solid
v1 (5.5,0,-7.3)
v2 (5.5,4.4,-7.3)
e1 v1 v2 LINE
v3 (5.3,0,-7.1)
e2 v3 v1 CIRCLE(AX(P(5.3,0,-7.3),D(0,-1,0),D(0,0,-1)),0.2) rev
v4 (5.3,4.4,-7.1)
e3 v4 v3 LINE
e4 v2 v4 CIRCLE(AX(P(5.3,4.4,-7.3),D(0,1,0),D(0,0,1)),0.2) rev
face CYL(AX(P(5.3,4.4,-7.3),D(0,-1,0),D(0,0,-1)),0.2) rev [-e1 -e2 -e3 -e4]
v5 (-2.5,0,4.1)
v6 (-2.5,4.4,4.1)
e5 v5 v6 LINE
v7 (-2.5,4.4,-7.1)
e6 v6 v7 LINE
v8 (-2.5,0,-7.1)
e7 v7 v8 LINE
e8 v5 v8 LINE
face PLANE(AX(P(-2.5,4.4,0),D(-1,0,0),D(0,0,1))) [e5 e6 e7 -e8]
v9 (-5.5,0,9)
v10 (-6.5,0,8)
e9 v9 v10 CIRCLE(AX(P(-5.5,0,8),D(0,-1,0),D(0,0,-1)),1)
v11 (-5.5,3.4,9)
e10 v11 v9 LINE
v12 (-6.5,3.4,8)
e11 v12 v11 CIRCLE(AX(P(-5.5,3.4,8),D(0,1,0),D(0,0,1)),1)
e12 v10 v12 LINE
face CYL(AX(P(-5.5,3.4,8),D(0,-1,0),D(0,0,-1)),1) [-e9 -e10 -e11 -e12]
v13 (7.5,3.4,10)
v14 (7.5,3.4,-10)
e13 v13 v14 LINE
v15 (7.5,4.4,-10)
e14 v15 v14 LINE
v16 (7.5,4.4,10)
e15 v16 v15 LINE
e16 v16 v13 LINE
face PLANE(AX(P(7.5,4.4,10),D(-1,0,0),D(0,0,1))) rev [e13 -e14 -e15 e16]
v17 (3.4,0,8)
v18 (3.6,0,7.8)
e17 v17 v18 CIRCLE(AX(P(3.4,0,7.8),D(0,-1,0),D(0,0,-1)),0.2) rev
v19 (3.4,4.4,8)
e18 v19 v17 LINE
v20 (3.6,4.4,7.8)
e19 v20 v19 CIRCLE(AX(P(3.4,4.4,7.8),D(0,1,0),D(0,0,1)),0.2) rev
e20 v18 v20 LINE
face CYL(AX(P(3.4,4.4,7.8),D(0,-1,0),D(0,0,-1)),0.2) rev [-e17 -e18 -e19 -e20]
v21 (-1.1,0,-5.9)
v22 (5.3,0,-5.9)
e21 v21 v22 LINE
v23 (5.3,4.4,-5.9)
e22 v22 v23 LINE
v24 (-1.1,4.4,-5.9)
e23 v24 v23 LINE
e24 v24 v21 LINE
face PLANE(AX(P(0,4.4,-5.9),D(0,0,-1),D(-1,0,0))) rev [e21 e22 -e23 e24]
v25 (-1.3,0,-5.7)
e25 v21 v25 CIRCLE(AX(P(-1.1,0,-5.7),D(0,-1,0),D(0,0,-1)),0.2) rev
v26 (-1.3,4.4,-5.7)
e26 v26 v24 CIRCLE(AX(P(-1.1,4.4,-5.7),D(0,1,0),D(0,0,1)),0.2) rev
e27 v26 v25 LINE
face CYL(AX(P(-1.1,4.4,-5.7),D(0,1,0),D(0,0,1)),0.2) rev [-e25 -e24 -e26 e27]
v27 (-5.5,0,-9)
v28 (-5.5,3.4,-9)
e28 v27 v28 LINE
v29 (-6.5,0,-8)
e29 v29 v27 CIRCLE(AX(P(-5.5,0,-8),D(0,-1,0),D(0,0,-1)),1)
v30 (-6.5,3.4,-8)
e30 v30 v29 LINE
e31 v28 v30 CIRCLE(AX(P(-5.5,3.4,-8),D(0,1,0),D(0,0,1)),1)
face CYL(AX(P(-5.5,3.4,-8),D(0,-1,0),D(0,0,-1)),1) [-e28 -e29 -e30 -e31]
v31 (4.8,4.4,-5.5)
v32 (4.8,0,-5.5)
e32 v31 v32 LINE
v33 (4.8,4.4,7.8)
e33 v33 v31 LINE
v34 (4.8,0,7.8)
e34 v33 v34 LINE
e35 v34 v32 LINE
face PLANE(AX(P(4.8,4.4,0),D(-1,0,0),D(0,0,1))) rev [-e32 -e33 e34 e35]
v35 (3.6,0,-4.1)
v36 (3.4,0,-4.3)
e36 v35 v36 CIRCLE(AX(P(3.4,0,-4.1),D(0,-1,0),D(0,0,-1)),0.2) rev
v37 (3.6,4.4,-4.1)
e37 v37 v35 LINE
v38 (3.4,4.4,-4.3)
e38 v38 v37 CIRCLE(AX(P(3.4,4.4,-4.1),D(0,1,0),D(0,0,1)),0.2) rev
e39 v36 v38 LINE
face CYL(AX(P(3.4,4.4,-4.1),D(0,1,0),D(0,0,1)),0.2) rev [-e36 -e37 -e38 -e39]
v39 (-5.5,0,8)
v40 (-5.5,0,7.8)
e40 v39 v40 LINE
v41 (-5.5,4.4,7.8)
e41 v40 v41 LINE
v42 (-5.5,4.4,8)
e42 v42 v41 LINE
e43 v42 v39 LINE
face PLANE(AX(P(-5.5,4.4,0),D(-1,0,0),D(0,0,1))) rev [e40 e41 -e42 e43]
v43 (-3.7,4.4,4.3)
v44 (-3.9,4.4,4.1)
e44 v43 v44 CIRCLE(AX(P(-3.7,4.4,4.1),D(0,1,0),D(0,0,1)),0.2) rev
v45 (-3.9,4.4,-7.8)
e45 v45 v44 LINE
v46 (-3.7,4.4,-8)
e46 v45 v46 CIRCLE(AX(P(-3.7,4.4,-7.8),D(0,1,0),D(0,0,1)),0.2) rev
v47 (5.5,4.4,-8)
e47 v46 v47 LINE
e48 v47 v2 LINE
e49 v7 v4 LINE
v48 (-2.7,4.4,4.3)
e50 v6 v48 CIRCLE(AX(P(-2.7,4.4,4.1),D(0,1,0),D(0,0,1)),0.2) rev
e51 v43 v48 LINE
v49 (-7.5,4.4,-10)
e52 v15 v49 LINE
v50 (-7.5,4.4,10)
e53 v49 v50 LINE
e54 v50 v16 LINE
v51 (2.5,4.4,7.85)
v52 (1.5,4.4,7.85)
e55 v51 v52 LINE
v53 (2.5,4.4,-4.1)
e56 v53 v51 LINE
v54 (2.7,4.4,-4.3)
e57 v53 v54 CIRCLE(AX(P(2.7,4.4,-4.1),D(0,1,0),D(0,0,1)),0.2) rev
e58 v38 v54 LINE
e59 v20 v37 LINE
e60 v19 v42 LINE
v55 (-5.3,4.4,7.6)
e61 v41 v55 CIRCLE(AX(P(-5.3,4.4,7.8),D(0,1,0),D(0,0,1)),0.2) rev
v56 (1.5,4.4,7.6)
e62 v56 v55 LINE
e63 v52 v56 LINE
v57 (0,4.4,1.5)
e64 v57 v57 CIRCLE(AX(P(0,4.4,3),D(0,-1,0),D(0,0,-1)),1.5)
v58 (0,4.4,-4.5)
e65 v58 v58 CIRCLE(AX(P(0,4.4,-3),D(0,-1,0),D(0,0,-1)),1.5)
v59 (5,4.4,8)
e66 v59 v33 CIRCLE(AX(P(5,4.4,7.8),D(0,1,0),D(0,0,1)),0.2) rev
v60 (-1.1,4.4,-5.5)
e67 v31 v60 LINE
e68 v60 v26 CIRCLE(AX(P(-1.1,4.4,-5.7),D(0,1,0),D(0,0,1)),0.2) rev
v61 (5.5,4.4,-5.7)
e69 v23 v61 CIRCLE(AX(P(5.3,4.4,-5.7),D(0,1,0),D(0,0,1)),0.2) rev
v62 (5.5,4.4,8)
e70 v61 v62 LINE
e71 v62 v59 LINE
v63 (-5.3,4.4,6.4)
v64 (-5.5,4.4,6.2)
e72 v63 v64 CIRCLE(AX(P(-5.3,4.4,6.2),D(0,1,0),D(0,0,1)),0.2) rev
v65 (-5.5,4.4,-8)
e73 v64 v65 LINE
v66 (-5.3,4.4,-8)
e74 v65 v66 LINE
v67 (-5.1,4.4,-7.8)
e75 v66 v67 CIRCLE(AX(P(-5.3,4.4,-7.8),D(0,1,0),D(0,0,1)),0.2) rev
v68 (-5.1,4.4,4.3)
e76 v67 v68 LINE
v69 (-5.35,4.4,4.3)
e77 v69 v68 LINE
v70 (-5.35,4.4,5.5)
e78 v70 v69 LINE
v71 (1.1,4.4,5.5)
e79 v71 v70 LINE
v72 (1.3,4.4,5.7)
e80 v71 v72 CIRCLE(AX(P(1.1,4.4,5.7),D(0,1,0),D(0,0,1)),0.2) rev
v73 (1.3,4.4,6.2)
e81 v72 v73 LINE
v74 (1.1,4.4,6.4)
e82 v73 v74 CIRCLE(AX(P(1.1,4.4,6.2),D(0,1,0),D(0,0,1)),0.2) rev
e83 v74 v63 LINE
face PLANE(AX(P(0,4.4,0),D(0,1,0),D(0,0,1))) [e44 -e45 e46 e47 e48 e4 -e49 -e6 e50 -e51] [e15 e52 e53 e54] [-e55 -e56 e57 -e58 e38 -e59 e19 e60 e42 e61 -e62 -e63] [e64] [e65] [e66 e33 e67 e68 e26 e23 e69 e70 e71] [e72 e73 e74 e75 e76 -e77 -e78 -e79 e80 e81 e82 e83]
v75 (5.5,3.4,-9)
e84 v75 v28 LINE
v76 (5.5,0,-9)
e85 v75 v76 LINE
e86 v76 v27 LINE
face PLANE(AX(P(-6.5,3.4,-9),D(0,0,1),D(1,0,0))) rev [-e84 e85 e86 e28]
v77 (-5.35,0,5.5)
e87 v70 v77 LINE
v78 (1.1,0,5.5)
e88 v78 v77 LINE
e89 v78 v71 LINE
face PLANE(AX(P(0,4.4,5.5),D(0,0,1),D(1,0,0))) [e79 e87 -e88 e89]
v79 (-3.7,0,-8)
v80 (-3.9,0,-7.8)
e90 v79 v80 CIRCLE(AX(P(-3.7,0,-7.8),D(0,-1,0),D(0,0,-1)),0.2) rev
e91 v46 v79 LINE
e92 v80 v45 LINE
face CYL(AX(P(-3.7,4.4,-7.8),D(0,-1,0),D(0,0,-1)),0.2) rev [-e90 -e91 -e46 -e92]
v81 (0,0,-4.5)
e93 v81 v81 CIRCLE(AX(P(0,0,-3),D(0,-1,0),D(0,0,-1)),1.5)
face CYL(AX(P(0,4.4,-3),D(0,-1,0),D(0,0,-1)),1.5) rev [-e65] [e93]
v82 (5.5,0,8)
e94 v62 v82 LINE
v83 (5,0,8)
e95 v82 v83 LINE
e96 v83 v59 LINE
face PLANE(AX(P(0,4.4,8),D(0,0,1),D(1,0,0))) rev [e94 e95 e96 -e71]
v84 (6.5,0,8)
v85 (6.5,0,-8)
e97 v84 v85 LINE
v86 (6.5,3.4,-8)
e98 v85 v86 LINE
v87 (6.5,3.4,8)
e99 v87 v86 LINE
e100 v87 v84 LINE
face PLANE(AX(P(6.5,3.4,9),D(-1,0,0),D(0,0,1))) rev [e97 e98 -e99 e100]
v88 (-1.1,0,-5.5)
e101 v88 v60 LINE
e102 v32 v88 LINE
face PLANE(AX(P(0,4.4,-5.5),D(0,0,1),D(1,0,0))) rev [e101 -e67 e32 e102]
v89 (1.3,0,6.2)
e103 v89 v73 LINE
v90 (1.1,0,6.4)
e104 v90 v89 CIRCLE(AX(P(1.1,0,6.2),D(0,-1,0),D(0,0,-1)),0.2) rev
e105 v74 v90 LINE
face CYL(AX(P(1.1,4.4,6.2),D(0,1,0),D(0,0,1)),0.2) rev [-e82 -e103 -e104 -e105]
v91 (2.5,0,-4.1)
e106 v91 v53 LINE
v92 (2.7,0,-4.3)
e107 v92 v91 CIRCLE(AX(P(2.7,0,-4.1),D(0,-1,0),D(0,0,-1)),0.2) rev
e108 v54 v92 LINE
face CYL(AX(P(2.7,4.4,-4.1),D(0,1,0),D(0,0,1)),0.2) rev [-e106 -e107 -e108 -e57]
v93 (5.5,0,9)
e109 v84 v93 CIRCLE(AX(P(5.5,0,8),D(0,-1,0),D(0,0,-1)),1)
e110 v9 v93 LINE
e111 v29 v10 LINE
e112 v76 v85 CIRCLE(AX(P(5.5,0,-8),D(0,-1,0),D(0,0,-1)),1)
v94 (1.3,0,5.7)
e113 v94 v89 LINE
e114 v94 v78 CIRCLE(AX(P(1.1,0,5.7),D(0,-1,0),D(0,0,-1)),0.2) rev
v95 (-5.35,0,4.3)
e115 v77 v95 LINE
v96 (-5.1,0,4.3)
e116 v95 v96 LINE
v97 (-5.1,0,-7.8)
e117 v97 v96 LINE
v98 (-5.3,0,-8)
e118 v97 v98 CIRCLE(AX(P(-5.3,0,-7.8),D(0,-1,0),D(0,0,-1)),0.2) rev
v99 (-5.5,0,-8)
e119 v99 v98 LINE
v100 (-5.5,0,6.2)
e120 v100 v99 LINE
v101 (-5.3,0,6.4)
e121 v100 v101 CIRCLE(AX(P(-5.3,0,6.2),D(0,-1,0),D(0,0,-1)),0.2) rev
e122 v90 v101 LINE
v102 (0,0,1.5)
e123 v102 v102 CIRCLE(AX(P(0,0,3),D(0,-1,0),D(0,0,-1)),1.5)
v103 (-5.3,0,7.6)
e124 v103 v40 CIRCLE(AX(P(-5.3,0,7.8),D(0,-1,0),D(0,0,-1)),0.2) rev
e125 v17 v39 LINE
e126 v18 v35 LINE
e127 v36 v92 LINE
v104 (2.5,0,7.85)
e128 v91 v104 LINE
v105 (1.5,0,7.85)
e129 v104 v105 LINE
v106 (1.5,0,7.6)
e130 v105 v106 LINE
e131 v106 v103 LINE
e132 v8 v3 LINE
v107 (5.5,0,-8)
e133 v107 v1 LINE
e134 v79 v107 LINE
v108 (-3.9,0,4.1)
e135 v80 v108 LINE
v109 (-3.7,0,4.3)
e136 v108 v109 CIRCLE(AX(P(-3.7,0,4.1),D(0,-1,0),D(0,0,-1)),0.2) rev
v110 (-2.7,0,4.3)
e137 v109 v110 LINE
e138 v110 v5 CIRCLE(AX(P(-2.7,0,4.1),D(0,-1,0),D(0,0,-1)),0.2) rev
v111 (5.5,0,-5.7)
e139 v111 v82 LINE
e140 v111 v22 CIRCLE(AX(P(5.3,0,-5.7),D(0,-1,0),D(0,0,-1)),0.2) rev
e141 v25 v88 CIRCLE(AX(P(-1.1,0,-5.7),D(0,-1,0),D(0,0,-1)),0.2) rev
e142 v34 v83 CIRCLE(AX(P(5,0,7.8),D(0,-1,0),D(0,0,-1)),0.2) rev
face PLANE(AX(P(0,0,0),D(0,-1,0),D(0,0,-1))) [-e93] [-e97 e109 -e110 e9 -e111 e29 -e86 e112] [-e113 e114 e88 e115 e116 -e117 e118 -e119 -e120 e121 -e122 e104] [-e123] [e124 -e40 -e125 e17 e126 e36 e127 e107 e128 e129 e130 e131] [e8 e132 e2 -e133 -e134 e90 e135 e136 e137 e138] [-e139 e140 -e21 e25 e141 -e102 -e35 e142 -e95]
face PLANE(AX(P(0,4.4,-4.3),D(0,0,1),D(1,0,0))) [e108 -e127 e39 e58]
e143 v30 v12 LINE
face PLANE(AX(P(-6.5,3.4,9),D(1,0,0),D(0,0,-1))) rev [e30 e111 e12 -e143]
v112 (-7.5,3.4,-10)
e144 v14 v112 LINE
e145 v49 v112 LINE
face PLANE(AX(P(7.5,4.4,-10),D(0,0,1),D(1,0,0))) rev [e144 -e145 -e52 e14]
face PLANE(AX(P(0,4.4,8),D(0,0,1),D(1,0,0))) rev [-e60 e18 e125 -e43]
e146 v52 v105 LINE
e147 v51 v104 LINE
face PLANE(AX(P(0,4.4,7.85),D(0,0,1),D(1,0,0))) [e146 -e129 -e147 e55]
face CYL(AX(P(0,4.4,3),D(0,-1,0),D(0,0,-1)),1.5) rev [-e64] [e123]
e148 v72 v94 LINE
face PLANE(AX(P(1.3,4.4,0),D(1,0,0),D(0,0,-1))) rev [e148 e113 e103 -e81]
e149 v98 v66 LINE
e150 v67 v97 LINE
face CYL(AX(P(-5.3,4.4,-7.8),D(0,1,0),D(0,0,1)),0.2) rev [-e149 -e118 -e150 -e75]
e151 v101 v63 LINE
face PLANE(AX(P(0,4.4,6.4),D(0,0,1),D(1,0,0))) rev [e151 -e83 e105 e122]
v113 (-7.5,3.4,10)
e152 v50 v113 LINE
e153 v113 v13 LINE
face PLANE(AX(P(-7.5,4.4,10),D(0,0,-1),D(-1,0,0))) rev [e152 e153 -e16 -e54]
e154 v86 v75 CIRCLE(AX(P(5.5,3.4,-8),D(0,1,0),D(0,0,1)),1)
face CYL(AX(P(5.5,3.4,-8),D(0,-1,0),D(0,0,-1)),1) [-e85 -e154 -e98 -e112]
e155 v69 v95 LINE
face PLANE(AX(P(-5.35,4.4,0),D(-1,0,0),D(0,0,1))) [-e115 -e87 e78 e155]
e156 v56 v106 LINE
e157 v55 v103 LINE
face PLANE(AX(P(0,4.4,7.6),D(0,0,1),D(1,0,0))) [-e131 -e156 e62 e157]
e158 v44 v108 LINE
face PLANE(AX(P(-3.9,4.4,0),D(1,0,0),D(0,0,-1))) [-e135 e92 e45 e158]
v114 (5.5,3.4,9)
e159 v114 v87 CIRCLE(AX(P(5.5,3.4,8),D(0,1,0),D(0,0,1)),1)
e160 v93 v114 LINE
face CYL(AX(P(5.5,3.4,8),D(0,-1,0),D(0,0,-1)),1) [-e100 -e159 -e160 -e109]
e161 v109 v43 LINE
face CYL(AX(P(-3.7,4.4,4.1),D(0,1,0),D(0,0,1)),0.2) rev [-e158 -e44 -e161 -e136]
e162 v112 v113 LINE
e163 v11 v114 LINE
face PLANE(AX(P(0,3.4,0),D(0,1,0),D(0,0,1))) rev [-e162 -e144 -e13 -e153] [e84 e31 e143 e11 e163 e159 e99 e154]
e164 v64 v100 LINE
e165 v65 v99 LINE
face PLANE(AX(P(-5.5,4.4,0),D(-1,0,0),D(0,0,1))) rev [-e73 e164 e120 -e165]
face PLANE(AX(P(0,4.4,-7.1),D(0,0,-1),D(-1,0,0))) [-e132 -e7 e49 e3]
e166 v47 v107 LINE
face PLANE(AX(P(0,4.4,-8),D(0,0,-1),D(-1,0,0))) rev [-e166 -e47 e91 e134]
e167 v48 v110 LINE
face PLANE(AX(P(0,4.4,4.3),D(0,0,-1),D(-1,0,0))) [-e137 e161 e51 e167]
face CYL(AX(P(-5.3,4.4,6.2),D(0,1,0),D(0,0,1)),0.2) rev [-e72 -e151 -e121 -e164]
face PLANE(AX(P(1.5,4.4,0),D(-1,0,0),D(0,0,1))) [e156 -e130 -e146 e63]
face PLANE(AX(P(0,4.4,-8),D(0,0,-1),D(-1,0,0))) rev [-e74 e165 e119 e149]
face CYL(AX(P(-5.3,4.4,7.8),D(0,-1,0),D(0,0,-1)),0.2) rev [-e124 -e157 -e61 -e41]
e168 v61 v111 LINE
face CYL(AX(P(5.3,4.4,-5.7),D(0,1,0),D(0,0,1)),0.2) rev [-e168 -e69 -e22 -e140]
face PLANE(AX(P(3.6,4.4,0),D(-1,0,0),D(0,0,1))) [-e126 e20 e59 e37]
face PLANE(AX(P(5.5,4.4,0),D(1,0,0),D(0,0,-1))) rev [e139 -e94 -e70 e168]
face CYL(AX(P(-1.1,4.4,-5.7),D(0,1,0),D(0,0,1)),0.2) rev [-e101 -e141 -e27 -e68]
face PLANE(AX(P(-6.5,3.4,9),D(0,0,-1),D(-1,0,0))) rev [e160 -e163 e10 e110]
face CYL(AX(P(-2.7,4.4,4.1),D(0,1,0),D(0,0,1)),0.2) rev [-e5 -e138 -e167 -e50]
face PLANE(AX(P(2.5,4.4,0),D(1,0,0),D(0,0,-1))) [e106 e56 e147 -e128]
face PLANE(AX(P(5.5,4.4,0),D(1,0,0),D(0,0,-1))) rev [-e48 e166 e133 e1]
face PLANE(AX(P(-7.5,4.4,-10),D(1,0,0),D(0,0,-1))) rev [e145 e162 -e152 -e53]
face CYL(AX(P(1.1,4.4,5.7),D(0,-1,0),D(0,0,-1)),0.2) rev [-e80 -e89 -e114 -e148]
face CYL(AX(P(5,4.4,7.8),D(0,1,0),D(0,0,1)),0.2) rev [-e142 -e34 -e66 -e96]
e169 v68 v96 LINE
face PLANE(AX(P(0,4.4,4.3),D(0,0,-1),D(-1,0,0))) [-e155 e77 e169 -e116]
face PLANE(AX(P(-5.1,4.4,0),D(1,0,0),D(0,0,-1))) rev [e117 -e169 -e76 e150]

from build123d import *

# Parameters (mm, degrees)
SKETCH1_W           = 13
SKETCH1_H           = 18
BOSS_EXTRUDE1_DEPTH = 3.4
SKETCH2_W           = 15
SKETCH2_H           = 20
BOSS_EXTRUDE2_DEPTH = 1
SKETCH3_R           = 1.5
CUT_EXTRUDE1_DEPTH  = 14.251792332
FILLET1_R           = 0.2
FILLET2_R           = 1


with BuildPart() as part:
    # Sketch1 → Boss-Extrude1 (new body)
    with BuildSketch(Plane(origin=(0, 0, 0), x_dir=(1, 0, 0), z_dir=(0, 1, 0))):
        Rectangle(SKETCH1_W, SKETCH1_H)
    extrude(amount=BOSS_EXTRUDE1_DEPTH)

    # Sketch2 → Boss-Extrude2 (add)
    with BuildSketch(Plane(origin=(0, 3.4, 0), x_dir=(1, 0, 0), z_dir=(0, 1, 0))):
        Rectangle(SKETCH2_W, SKETCH2_H)
    extrude(amount=BOSS_EXTRUDE2_DEPTH)

    # Sketch3 → Cut-Extrude1 (cut, through all)
    with BuildSketch(Plane.XZ):
        with Locations(Location((0, 3, 0), (0, 0, 270))):
            Circle(SKETCH3_R)
        with Locations(Location((0, -3, 0), (0, 0, 270))):
            Circle(SKETCH3_R)
        Polygon((4.8, -5.5), (-1.3, -5.5), (-1.3, -5.9), (5.5, -5.9), (5.5, 8), (4.8, 8), align=None)
        Polygon((2.5, 7.85), (2.5, -4.3), (3.6, -4.3), (3.6, 8), (-5.5, 8), (-5.5, 7.6), (1.5, 7.6), (1.5, 7.85), align=None)
        Polygon((-2.5, -7.1), (-2.5, 4.3), (-3.9, 4.3), (-3.9, -8), (5.5, -8), (5.5, -7.1), align=None)
        Polygon((-5.35, 5.5), (1.3, 5.5), (1.3, 6.4), (-5.5, 6.4), (-5.5, -8), (-5.1, -8), (-5.1, 4.3), (-5.35, 4.3), align=None)
    extrude(amount=-CUT_EXTRUDE1_DEPTH, mode=Mode.SUBTRACT)

    # Fillet1
    fillet1_edges = [part.edges().sort_by_distance(p)[0] for p in [
        (-5.1, 2.2, -8),
        (-3.9, 2.2, -8),
        (-5.5, 2.2, 6.4),
        (-5.5, 2.2, 7.6),
        (4.8, 2.2, 8),
        (3.6, 2.2, 8),
        (-3.9, 2.2, 4.3),
        (-2.5, 2.2, 4.3),
        (1.3, 2.2, 5.5),
        (1.3, 2.2, 6.4),
        (5.5, 2.2, -7.1),
        (5.5, 2.2, -5.9),
        (-1.3, 2.2, -5.9),
        (-1.3, 2.2, -5.5),
        (3.6, 2.2, -4.3),
        (2.5, 2.2, -4.3),
    ]]
    fillet(fillet1_edges, radius=FILLET1_R - 0.0001)  # a hair under: the kernel refuses the full size

    # Fillet2
    fillet2_edges = [part.edges().sort_by_distance(p)[0] for p in [
        (6.5, 1.7, 9),
        (-6.5, 1.7, 9),
        (-6.5, 1.7, -9),
        (6.5, 1.7, -9),
    ]]
    fillet(fillet2_edges, radius=FILLET2_R)


solid = part.part
